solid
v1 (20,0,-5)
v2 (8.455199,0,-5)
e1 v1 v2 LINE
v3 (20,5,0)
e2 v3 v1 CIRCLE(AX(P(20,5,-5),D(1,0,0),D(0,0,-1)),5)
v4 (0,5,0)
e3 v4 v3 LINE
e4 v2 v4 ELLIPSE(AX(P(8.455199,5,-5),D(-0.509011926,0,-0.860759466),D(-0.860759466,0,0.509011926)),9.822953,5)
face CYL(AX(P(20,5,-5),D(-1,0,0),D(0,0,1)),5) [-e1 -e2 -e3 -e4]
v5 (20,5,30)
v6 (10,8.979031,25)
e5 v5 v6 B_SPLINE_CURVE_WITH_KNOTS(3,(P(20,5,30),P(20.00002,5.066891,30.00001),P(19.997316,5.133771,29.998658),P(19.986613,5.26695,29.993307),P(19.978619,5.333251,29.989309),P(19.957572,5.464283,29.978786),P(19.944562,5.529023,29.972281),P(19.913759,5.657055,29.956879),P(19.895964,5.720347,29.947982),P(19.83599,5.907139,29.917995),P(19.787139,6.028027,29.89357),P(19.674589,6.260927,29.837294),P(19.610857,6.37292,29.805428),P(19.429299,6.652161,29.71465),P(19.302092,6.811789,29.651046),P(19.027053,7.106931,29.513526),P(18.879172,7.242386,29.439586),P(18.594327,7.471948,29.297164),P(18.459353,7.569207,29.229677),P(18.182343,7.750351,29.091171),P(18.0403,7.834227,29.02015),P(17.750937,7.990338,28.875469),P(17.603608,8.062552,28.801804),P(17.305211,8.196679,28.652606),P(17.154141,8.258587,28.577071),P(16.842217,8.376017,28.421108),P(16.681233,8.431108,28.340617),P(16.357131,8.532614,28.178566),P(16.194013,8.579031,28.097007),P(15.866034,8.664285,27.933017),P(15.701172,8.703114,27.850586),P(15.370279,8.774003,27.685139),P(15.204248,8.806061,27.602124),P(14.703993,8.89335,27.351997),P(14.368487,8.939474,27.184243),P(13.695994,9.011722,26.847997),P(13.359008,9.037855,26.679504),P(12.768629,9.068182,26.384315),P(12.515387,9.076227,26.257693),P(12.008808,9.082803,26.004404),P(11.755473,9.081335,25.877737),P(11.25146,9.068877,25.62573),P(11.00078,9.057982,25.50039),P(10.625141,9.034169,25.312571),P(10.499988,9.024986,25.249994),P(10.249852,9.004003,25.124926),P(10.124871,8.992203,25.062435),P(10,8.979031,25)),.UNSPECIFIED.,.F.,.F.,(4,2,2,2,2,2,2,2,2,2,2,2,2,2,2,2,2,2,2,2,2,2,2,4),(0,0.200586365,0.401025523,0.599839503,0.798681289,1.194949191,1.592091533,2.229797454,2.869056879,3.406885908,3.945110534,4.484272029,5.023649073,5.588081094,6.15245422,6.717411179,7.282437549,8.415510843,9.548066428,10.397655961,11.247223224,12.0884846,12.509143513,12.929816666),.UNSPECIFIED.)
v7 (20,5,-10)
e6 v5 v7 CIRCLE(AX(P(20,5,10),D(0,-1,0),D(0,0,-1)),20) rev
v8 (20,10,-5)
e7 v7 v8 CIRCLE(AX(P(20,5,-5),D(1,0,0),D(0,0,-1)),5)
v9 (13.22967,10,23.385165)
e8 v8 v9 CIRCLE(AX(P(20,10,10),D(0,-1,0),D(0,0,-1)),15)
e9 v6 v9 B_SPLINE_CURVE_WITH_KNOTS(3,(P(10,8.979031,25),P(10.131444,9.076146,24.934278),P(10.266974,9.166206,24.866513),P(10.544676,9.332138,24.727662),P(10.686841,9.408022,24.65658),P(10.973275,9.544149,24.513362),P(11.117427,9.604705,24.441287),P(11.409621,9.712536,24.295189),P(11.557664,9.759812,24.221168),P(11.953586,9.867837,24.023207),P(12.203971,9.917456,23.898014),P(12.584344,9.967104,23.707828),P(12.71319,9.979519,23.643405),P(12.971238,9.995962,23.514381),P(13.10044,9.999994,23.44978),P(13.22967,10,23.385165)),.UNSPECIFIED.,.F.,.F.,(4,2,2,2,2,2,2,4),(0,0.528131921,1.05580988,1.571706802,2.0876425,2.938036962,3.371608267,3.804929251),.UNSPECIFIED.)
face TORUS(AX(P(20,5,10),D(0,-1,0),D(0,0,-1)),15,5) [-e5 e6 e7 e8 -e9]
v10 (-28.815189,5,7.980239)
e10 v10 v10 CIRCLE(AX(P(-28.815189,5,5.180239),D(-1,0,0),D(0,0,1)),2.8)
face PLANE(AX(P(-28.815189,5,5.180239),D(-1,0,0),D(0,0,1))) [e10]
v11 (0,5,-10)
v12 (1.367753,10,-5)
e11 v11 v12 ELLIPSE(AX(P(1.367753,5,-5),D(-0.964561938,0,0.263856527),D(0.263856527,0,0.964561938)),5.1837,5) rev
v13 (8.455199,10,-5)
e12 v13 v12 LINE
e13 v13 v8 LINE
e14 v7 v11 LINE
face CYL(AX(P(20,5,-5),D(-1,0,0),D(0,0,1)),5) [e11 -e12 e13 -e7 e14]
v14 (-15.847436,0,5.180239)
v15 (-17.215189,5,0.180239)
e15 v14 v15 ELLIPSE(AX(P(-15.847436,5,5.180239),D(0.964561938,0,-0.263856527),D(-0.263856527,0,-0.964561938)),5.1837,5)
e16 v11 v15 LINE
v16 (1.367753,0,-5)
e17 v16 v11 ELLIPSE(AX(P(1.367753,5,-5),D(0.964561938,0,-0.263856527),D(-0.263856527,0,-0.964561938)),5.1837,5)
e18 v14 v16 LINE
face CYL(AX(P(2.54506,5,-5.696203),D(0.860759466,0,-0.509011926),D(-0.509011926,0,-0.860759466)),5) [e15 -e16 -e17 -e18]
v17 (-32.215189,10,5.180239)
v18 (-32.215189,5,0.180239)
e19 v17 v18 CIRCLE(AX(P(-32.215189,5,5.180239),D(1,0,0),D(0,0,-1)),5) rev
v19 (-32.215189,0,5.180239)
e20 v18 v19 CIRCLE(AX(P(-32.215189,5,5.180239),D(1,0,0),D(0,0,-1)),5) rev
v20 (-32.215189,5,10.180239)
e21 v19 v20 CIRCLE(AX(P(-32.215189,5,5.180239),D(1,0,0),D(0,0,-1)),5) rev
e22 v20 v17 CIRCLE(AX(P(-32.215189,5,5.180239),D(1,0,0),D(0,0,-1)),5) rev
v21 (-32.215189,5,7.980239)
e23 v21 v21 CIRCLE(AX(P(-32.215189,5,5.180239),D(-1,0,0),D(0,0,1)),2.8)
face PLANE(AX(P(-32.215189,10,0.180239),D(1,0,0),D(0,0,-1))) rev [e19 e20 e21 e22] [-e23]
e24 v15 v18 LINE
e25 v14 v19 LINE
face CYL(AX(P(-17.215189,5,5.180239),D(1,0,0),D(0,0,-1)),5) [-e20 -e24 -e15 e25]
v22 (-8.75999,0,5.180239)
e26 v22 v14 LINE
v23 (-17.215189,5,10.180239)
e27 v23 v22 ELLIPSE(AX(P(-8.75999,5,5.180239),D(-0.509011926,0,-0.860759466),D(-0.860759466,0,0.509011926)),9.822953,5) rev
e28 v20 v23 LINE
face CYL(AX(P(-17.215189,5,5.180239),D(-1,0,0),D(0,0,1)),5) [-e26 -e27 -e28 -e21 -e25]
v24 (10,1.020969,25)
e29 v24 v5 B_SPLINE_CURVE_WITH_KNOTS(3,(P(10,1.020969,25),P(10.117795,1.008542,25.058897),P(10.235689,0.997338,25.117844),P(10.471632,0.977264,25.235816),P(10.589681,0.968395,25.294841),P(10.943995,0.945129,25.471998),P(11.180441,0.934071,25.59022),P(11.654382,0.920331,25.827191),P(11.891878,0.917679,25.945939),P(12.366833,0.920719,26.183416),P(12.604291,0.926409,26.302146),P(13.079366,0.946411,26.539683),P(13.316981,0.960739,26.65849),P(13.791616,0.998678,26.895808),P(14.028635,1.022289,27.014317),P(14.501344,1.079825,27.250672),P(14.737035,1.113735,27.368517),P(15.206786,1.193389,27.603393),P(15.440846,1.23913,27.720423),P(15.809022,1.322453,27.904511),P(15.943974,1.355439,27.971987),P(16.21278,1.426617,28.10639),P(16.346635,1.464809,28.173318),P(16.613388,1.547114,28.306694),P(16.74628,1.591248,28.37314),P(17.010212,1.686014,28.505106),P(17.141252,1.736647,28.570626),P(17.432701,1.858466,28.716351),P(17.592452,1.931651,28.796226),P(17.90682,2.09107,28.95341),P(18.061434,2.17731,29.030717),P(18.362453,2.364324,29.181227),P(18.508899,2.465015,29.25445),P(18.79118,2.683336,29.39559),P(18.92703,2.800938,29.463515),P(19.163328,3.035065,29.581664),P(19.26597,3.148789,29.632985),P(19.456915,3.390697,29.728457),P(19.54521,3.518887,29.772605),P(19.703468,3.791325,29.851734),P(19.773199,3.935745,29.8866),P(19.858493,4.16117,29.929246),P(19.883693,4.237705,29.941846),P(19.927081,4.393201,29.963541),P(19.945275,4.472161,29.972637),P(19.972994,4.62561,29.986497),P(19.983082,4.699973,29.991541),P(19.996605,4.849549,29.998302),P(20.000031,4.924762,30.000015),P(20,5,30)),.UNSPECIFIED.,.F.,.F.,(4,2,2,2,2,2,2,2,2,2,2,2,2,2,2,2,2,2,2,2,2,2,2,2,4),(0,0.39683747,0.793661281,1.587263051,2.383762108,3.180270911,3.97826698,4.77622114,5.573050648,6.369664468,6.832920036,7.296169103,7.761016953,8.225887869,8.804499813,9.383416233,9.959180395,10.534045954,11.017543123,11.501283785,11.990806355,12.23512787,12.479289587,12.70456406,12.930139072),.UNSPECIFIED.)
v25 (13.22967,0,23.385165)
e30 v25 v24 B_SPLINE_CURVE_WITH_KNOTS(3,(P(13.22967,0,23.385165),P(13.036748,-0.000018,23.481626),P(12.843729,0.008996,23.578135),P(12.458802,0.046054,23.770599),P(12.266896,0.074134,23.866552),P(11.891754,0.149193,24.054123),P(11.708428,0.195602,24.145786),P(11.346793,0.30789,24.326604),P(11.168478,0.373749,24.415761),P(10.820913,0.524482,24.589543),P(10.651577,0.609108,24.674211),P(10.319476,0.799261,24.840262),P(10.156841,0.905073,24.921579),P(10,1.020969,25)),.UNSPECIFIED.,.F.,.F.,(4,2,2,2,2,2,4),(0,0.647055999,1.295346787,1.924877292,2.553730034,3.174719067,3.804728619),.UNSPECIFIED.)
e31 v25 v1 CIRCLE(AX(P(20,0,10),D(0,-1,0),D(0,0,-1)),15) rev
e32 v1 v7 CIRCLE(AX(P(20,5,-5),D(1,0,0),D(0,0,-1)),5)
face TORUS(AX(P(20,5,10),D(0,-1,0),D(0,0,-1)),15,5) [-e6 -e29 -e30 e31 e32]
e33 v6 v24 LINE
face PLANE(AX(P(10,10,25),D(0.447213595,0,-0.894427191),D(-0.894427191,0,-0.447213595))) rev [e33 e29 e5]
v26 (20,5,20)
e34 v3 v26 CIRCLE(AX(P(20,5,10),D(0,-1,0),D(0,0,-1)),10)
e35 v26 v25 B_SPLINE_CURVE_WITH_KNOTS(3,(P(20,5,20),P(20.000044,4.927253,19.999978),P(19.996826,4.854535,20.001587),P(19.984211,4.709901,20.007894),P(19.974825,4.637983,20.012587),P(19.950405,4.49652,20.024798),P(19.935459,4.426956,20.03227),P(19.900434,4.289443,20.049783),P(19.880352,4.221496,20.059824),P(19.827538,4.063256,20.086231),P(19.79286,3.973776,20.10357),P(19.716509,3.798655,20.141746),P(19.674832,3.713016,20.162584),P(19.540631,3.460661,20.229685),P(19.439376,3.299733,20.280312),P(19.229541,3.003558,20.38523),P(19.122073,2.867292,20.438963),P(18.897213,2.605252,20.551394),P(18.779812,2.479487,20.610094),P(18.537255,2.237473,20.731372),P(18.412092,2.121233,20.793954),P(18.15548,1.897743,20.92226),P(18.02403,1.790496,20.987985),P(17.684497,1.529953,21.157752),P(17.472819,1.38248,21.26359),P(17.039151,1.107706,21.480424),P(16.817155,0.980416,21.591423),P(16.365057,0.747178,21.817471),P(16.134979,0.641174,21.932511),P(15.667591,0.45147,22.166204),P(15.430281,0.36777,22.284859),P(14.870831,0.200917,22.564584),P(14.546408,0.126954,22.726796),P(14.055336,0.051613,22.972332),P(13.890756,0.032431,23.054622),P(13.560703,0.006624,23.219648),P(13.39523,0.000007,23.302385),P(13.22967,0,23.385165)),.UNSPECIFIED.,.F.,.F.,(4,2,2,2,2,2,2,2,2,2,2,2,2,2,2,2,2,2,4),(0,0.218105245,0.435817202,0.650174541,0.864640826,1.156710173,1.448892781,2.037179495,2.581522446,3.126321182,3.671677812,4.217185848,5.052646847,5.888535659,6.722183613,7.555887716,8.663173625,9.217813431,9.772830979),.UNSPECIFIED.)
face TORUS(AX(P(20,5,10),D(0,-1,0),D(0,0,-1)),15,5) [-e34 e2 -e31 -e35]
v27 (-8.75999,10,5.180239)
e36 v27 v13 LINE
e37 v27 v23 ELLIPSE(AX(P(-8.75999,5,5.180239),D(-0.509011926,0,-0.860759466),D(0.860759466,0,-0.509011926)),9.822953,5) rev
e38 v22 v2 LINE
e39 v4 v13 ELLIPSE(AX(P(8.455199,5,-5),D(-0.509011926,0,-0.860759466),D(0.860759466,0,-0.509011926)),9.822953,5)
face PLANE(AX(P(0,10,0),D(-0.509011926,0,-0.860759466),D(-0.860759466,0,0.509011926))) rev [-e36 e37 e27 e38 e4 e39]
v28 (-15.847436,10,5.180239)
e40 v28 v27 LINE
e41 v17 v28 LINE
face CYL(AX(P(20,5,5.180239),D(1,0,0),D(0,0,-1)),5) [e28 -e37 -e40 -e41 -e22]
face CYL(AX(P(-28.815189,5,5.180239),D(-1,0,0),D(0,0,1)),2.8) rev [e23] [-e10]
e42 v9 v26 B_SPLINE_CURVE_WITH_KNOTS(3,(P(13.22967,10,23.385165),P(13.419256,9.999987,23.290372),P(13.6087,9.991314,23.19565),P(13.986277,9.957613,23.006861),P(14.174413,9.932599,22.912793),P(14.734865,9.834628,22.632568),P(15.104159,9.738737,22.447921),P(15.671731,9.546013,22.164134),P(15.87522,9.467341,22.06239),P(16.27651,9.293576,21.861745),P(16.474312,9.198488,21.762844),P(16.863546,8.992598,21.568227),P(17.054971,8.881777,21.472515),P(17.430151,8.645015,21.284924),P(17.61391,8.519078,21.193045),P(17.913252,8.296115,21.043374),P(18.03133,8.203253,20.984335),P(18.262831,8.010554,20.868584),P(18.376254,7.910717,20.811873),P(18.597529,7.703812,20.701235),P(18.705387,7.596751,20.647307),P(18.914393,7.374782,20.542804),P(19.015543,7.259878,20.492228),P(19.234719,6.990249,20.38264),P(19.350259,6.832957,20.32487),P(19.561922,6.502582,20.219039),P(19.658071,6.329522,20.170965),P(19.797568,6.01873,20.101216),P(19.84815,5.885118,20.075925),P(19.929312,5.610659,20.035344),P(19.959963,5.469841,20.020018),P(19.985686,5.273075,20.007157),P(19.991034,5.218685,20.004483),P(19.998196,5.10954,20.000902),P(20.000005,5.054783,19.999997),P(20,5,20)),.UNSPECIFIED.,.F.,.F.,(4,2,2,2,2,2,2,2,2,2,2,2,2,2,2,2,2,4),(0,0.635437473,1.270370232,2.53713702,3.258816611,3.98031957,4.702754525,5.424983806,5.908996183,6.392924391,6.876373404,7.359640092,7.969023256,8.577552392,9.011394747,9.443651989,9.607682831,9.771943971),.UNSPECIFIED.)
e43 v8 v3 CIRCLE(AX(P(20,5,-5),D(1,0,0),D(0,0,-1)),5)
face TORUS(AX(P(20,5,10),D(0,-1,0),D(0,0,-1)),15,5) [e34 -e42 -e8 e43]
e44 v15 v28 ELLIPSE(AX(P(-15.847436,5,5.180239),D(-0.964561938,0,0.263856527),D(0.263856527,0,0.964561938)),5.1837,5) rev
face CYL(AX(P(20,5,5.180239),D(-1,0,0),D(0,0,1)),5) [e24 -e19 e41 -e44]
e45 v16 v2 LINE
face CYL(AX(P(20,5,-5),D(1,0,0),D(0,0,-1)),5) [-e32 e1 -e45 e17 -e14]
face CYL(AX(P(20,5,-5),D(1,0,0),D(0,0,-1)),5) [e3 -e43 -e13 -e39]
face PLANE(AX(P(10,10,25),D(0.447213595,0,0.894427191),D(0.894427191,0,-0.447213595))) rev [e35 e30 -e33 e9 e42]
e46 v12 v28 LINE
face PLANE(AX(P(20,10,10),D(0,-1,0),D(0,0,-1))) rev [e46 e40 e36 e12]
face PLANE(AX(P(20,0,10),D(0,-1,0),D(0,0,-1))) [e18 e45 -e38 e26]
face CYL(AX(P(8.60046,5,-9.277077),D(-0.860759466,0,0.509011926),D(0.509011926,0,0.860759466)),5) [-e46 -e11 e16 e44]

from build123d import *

# Parameters (mm, degrees)
EXTRUDE_1_DEPTH     = 10
FILLET_5_R          = 5
FILLET_6_R          = 5
SKETCH_22_R         = 2.8
CUT_EXTRUDE_1_DEPTH = 3.4


with BuildPart() as part:
    # Эскиз2 → Бобышка-Вытянуть1 (new body)
    with BuildSketch(Plane(origin=(0, 0, 0), x_dir=(1, 0, 0), z_dir=(0, 1, 0))):
        with BuildLine():
            Line((10, -25), (20, -20))
            ThreePointArc((20, -20), (30, -10), (20, 0))
            Line((20, 0), (0, 0))
            Line((0, 0), (-17.215189328, -10.180238524))
            Line((-17.215189328, -10.180238524), (-32.215189328, -10.180238524))
            Line((-32.215189328, -10.180238524), (-32.215189328, -0.180238524))
            Line((-32.215189328, -0.180238524), (-17.215189328, -0.180238524))
            Line((-17.215189328, -0.180238524), (0, 10))
            Line((0, 10), (20, 10))
            ThreePointArc((20, 10), (40, -10), (20, -30))
            Line((20, -30), (10, -25))
        make_face()
    extrude(amount=EXTRUDE_1_DEPTH)

    # Скругление5
    fillet_5_edges = [part.edges().sort_by_distance(p)[0] for p in [
        (30, 10, 10),
        (30, 0, 10),
        (10, 10, 0),
        (10, 0, 0),
        (-24.715189328, 10, 10.180238524),
        (-24.715189328, 0, 10.180238524),
    ]]
    fillet(fillet_5_edges, radius=FILLET_5_R - 0.0001)  # a hair under: the kernel refuses the full size

    # Скругление6
    fillet_6_edges = [part.edges().sort_by_distance(p)[0] for p in [
        (40, 10, 10),
        (40, 0, 10),
        (10, 10, -10),
        (10, 0, -10),
        (-8.607594664, 10, -4.909880738),
        (-8.607594664, 0, -4.909880738),
        (-24.715189328, 10, 0.180238524),
        (-24.715189328, 0, 0.180238524),
    ]]
    fillet(fillet_6_edges, radius=FILLET_6_R - 0.0001)  # a hair under: the kernel refuses the full size

    # Эскиз22 → Вырез-Вытянуть1 (cut)
    with BuildSketch(Plane.ZY.offset(32.215189328)):
        with Locations((5.180238524, 5)):
            Circle(SKETCH_22_R)
    extrude(amount=-CUT_EXTRUDE_1_DEPTH, mode=Mode.SUBTRACT)


solid = part.part
